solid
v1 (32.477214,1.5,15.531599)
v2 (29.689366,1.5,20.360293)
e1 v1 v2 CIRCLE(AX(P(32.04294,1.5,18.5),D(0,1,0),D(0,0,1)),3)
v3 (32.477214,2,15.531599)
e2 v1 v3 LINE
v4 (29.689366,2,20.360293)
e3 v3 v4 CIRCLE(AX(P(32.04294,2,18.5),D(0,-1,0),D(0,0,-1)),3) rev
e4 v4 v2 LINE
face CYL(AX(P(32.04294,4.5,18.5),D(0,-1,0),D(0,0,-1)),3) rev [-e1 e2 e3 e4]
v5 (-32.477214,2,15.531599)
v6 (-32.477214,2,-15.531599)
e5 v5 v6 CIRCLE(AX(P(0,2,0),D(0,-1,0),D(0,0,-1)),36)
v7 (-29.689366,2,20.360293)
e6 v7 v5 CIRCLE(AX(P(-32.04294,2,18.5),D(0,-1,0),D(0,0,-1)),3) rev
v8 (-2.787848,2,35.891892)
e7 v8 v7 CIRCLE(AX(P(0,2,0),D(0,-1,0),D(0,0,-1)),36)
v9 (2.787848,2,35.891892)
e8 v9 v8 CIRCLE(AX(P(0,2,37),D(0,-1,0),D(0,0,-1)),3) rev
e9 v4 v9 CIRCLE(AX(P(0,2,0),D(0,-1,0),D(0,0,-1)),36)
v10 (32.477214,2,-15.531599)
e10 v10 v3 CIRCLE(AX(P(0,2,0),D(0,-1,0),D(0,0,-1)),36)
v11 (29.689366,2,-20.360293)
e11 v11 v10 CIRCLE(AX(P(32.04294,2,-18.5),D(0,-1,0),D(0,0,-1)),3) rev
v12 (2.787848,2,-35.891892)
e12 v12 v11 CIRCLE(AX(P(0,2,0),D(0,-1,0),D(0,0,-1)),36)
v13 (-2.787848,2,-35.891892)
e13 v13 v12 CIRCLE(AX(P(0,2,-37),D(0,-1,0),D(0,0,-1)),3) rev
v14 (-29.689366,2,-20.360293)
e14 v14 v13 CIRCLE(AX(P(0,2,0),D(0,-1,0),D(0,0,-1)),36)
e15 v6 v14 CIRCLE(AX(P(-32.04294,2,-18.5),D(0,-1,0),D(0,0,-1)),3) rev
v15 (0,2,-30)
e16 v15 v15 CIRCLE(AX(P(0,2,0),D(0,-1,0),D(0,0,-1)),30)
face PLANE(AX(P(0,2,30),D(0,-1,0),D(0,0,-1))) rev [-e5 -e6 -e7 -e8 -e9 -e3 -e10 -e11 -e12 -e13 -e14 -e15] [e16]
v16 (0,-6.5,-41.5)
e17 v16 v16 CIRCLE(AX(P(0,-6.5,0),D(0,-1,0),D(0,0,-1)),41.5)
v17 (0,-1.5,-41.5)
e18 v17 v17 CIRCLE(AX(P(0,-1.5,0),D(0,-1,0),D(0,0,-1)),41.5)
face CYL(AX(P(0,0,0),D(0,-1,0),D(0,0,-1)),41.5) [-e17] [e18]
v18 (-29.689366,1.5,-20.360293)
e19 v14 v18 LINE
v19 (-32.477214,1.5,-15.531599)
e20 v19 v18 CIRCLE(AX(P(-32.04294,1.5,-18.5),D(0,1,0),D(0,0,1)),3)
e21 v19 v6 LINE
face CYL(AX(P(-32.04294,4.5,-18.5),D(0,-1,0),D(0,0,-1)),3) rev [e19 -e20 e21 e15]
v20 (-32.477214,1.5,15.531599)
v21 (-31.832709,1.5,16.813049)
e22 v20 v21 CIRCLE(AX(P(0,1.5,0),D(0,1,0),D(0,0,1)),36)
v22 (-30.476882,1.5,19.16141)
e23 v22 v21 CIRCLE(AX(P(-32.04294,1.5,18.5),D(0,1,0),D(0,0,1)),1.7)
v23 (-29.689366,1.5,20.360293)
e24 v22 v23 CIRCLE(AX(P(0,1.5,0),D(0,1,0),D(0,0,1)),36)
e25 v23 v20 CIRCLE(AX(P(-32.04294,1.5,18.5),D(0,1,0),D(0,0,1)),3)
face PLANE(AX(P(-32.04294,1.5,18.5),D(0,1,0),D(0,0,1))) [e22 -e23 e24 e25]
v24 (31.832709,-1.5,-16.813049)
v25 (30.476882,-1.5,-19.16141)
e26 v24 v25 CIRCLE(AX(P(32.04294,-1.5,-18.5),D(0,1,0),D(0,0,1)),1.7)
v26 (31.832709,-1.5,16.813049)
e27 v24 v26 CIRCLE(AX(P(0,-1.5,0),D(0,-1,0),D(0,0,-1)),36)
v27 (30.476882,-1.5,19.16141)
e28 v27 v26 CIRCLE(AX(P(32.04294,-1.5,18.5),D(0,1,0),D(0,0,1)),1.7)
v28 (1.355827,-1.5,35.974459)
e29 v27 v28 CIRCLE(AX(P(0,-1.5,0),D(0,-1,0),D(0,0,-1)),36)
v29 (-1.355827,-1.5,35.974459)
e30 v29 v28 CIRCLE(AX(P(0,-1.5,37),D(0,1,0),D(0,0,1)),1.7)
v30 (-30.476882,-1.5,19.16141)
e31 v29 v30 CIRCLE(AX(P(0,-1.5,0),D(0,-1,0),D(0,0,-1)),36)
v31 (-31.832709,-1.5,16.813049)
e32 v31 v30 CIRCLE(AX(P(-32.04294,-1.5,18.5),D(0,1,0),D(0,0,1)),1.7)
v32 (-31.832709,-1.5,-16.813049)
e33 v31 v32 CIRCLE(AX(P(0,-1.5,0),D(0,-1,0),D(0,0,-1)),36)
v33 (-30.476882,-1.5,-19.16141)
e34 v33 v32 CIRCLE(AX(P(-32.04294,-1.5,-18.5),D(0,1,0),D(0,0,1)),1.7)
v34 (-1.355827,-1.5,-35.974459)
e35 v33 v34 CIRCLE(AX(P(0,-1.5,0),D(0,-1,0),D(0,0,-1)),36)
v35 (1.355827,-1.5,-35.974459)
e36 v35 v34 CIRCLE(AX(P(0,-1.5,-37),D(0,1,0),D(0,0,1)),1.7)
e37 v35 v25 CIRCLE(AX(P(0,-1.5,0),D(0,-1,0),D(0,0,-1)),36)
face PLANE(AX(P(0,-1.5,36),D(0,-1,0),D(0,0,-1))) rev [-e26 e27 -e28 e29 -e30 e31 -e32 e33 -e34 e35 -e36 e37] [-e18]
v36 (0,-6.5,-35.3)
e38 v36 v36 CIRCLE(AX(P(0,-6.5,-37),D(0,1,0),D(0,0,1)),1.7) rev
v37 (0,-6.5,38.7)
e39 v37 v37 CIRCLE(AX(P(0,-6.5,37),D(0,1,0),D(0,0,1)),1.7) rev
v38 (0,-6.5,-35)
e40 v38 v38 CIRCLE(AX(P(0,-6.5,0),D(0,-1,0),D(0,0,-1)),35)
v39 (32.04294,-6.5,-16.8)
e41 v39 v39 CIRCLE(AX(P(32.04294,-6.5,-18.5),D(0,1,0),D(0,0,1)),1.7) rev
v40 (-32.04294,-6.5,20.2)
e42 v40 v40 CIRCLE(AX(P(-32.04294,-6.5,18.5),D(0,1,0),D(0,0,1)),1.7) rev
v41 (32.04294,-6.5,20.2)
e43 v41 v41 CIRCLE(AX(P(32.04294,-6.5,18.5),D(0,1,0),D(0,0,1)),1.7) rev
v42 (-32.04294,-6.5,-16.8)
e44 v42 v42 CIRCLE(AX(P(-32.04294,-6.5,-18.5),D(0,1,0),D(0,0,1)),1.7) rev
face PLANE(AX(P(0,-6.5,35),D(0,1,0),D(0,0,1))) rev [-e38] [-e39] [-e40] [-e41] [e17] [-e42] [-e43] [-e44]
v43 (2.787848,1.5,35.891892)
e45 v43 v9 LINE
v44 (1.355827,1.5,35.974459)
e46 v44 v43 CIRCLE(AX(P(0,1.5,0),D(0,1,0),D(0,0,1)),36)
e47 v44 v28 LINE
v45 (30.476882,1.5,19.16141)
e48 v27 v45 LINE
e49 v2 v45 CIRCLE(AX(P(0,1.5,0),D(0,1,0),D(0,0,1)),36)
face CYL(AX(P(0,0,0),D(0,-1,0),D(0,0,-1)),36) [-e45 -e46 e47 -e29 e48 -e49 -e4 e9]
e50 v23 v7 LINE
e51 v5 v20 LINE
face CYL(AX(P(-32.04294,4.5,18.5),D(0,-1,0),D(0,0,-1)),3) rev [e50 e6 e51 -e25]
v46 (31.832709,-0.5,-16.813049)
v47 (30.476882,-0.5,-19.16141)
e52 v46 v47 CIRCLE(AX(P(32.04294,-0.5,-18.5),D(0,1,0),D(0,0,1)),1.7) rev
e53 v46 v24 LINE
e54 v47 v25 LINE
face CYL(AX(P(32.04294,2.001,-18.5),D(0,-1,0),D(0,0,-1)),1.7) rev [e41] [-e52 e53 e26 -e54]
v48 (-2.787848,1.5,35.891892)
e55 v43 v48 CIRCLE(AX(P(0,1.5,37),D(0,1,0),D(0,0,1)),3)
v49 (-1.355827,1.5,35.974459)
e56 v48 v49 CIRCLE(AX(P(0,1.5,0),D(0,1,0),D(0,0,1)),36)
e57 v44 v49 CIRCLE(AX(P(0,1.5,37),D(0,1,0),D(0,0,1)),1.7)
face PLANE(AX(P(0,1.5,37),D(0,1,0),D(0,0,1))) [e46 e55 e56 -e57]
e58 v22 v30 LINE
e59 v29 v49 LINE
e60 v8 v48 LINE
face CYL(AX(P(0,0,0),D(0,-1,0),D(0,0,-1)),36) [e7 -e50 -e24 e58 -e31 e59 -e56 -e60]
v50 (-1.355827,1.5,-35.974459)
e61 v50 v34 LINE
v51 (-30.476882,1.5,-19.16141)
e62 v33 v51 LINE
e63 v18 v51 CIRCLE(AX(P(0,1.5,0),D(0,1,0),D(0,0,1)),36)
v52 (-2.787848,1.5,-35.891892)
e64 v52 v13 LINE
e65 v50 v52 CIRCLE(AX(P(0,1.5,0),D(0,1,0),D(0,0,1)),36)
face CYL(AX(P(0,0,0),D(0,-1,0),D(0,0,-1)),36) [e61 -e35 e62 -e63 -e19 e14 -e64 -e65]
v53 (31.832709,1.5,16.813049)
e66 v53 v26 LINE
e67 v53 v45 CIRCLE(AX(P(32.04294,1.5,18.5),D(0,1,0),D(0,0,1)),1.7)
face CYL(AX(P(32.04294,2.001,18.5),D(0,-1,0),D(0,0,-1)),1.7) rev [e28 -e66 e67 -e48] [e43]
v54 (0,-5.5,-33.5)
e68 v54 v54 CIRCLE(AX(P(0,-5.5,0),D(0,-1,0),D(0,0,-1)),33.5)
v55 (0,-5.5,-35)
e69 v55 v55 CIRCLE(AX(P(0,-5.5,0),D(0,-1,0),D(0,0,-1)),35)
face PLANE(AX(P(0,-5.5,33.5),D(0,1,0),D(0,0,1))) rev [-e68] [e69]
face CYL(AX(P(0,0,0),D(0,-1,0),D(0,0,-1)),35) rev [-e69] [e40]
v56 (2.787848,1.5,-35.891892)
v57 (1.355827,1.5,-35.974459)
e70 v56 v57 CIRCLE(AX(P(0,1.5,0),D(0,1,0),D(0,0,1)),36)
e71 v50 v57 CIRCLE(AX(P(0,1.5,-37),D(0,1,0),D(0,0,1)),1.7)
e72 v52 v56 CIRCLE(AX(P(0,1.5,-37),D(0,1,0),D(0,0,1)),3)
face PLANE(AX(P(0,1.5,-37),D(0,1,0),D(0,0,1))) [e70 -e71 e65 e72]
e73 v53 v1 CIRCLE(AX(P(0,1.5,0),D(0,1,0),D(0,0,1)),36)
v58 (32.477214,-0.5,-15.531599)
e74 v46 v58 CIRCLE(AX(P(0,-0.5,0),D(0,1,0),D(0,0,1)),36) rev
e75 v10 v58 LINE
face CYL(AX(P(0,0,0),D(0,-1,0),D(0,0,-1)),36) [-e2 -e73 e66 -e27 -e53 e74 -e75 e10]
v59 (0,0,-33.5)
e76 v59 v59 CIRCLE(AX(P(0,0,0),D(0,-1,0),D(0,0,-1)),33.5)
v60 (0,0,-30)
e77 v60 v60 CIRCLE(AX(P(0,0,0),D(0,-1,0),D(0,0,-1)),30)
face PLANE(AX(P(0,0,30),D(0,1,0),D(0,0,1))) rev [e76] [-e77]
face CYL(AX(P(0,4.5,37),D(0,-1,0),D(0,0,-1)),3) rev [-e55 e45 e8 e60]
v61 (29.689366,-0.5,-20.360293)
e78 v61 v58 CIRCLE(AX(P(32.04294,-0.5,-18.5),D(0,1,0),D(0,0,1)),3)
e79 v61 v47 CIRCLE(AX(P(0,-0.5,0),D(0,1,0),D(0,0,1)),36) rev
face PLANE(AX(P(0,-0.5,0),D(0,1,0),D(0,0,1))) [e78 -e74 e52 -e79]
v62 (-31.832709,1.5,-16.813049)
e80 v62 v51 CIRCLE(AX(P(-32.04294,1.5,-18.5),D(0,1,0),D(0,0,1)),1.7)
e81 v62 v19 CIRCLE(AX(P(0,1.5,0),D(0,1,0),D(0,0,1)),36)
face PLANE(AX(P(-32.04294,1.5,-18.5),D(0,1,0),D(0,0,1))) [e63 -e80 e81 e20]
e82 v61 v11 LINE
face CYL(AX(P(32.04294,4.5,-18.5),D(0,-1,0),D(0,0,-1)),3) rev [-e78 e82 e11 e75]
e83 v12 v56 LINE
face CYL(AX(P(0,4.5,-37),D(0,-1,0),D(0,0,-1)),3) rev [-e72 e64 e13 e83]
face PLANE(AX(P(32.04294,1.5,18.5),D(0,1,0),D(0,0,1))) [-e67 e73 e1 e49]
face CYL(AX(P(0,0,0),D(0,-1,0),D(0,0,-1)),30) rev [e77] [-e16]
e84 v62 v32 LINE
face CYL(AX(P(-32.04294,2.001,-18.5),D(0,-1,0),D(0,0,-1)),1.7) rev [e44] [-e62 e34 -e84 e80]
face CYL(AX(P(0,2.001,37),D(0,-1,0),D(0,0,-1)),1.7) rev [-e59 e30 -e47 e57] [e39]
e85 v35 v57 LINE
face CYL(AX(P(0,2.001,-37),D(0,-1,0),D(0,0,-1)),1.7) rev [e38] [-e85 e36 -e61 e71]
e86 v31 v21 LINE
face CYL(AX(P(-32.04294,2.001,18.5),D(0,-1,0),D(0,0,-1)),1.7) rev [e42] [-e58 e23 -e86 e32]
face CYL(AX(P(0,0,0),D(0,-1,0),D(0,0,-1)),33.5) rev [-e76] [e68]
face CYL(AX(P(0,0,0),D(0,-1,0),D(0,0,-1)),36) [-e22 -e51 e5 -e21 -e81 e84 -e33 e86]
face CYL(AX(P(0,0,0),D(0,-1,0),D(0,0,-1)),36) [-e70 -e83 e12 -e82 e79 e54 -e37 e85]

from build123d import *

# Parameters (mm, degrees)
SKETCH_3_R                      = 1.7
CUT_EXTRUDE_1_DEPTH             = 10
CUT_EXTRUDE_1_DIRECTION_2_REACH = 60.902
CUT_EXTRUDE_START               = 3
SKETCH_4_R                      = 3
CUT_EXTRUDE_2_DEPTH             = 3
SKETCH_7_R                      = 3
CUT_EXTRUDE_3_DEPTH             = 10
EXTRUDE_1_DEPTH                 = 1


with BuildPart() as part:
    # 草图2 → 旋转1 (revolve)
    with BuildSketch(Plane(origin=(0, 0, 0), x_dir=(0, 0, -1), z_dir=(1, 0, 0))):
        Polygon((-30, 0), (-30, 2), (-36, 2), (-36, -1.5), (-41.5, -1.5), (-41.5, -6.5), (-35, -6.5), (-35, -5.5), (-33.5, -5.5), (-33.5, 0), align=None)
    revolve(axis=Axis((0, 0, 0), (0, 1, 0)))

    # 草图3 → 切除-拉伸1 (cut)
    with BuildSketch(Plane(origin=(0, -1.5, 0), x_dir=(1, 0, 0), z_dir=(0, 1, 0))):
        with Locations((0, 37)):
            Circle(SKETCH_3_R)
        with Locations((32.04293994, 18.5)):
            Circle(SKETCH_3_R)
        with Locations((32.04293994, -18.5)):
            Circle(SKETCH_3_R)
        with Locations((0, -37)):
            Circle(SKETCH_3_R)
        with Locations((-32.04293994, -18.5)):
            Circle(SKETCH_3_R)
        with Locations((-32.04293994, 18.5)):
            Circle(SKETCH_3_R)
    extrude(amount=-CUT_EXTRUDE_1_DEPTH, mode=Mode.SUBTRACT)

    # 草图3 → 切除-拉伸1 direction 2 (cut, up to next)
    with BuildSketch(Plane(origin=(0, -1.5, 0), x_dir=(1, 0, 0), z_dir=(0, 1, 0)), mode=Mode.PRIVATE) as cut_extrude_1_direction_2_sk1:
        with Locations((0, 37)):
            Circle(SKETCH_3_R)
    cut_extrude_1_direction_2_tool1 = extrude(cut_extrude_1_direction_2_sk1.sketch, amount=CUT_EXTRUDE_1_DIRECTION_2_REACH, mode=Mode.PRIVATE) & part.part
    # 草图3 → 切除-拉伸1 direction 2 (cut, up to next)
    with BuildSketch(Plane(origin=(0, -1.5, 0), x_dir=(1, 0, 0), z_dir=(0, 1, 0)), mode=Mode.PRIVATE) as cut_extrude_1_direction_2_sk2:
        with Locations((32.04293994, 18.5)):
            Circle(SKETCH_3_R)
    cut_extrude_1_direction_2_tool2 = extrude(cut_extrude_1_direction_2_sk2.sketch, amount=CUT_EXTRUDE_1_DIRECTION_2_REACH, mode=Mode.PRIVATE) & part.part
    # 草图3 → 切除-拉伸1 direction 2 (cut, up to next)
    with BuildSketch(Plane(origin=(0, -1.5, 0), x_dir=(1, 0, 0), z_dir=(0, 1, 0)), mode=Mode.PRIVATE) as cut_extrude_1_direction_2_sk3:
        with Locations((32.04293994, -18.5)):
            Circle(SKETCH_3_R)
    cut_extrude_1_direction_2_tool3 = extrude(cut_extrude_1_direction_2_sk3.sketch, amount=CUT_EXTRUDE_1_DIRECTION_2_REACH, mode=Mode.PRIVATE) & part.part
    # 草图3 → 切除-拉伸1 direction 2 (cut, up to next)
    with BuildSketch(Plane(origin=(0, -1.5, 0), x_dir=(1, 0, 0), z_dir=(0, 1, 0)), mode=Mode.PRIVATE) as cut_extrude_1_direction_2_sk4:
        with Locations((0, -37)):
            Circle(SKETCH_3_R)
    cut_extrude_1_direction_2_tool4 = extrude(cut_extrude_1_direction_2_sk4.sketch, amount=CUT_EXTRUDE_1_DIRECTION_2_REACH, mode=Mode.PRIVATE) & part.part
    # 草图3 → 切除-拉伸1 direction 2 (cut, up to next)
    with BuildSketch(Plane(origin=(0, -1.5, 0), x_dir=(1, 0, 0), z_dir=(0, 1, 0)), mode=Mode.PRIVATE) as cut_extrude_1_direction_2_sk5:
        with Locations((-32.04293994, -18.5)):
            Circle(SKETCH_3_R)
    cut_extrude_1_direction_2_tool5 = extrude(cut_extrude_1_direction_2_sk5.sketch, amount=CUT_EXTRUDE_1_DIRECTION_2_REACH, mode=Mode.PRIVATE) & part.part
    # 草图3 → 切除-拉伸1 direction 2 (cut, up to next)
    with BuildSketch(Plane(origin=(0, -1.5, 0), x_dir=(1, 0, 0), z_dir=(0, 1, 0)), mode=Mode.PRIVATE) as cut_extrude_1_direction_2_sk6:
        with Locations((-32.04293994, 18.5)):
            Circle(SKETCH_3_R)
    cut_extrude_1_direction_2_tool6 = extrude(cut_extrude_1_direction_2_sk6.sketch, amount=CUT_EXTRUDE_1_DIRECTION_2_REACH, mode=Mode.PRIVATE) & part.part
    add(cut_extrude_1_direction_2_tool1.solids().sort_by_distance((0, -1.5, -37))[0], mode=Mode.SUBTRACT)
    add(cut_extrude_1_direction_2_tool2.solids().sort_by_distance((32.04294, -1.5, -18.5))[0], mode=Mode.SUBTRACT)
    add(cut_extrude_1_direction_2_tool3.solids().sort_by_distance((32.04294, -1.5, 18.5))[0], mode=Mode.SUBTRACT)
    add(cut_extrude_1_direction_2_tool4.solids().sort_by_distance((0, -1.5, 37))[0], mode=Mode.SUBTRACT)
    add(cut_extrude_1_direction_2_tool5.solids().sort_by_distance((-32.04294, -1.5, 18.5))[0], mode=Mode.SUBTRACT)
    add(cut_extrude_1_direction_2_tool6.solids().sort_by_distance((-32.04294, -1.5, -18.5))[0], mode=Mode.SUBTRACT)

    # 草图4 → 切除-拉伸2 (cut)
    with BuildSketch(Plane(origin=(0, -1.5, 0), x_dir=(1, 0, 0), z_dir=(0, 1, 0)).offset(CUT_EXTRUDE_START)):
        with Locations((0, 37)):
            Circle(SKETCH_4_R)
        with Locations((32.04293994, 18.5)):
            Circle(SKETCH_4_R)
        with Locations((32.04293994, -18.5)):
            Circle(SKETCH_4_R)
        with Locations((0, -37)):
            Circle(SKETCH_4_R)
        with Locations((-32.04293994, -18.5)):
            Circle(SKETCH_4_R)
        with Locations((-32.04293994, 18.5)):
            Circle(SKETCH_4_R)
    extrude(amount=CUT_EXTRUDE_2_DEPTH, mode=Mode.SUBTRACT)

    # 草图7 → 切除-拉伸3 (cut)
    with BuildSketch(Plane(origin=(0, -1.5, 0), x_dir=(1, 0, 0), z_dir=(0, 1, 0))):
        with Locations((32.04293994, 18.5)):
            Circle(SKETCH_7_R)
    extrude(amount=CUT_EXTRUDE_3_DEPTH, mode=Mode.SUBTRACT)

    # 草图8 → 凸台-拉伸1 (add)
    with BuildSketch(Plane(origin=(0, -1.5, 0), x_dir=(1, 0, 0), z_dir=(0, 1, 0))):
        with BuildLine():
            ThreePointArc((30.476882326, 19.161410274), (30.089095942, 19.764774357), (29.689366173, 20.360293128))
            ThreePointArc((29.689366173, 20.360293128), (29.444863729, 17), (32.477214164, 15.531598764))
            ThreePointArc((32.477214164, 15.531598764), (32.161344664, 16.175534285), (31.832709232, 16.813049186))
            ThreePointArc((31.832709232, 16.813049186), (30.570696754, 17.65), (30.476882326, 19.161410274))
        make_face()
    extrude(amount=EXTRUDE_1_DEPTH)


solid = part.part
